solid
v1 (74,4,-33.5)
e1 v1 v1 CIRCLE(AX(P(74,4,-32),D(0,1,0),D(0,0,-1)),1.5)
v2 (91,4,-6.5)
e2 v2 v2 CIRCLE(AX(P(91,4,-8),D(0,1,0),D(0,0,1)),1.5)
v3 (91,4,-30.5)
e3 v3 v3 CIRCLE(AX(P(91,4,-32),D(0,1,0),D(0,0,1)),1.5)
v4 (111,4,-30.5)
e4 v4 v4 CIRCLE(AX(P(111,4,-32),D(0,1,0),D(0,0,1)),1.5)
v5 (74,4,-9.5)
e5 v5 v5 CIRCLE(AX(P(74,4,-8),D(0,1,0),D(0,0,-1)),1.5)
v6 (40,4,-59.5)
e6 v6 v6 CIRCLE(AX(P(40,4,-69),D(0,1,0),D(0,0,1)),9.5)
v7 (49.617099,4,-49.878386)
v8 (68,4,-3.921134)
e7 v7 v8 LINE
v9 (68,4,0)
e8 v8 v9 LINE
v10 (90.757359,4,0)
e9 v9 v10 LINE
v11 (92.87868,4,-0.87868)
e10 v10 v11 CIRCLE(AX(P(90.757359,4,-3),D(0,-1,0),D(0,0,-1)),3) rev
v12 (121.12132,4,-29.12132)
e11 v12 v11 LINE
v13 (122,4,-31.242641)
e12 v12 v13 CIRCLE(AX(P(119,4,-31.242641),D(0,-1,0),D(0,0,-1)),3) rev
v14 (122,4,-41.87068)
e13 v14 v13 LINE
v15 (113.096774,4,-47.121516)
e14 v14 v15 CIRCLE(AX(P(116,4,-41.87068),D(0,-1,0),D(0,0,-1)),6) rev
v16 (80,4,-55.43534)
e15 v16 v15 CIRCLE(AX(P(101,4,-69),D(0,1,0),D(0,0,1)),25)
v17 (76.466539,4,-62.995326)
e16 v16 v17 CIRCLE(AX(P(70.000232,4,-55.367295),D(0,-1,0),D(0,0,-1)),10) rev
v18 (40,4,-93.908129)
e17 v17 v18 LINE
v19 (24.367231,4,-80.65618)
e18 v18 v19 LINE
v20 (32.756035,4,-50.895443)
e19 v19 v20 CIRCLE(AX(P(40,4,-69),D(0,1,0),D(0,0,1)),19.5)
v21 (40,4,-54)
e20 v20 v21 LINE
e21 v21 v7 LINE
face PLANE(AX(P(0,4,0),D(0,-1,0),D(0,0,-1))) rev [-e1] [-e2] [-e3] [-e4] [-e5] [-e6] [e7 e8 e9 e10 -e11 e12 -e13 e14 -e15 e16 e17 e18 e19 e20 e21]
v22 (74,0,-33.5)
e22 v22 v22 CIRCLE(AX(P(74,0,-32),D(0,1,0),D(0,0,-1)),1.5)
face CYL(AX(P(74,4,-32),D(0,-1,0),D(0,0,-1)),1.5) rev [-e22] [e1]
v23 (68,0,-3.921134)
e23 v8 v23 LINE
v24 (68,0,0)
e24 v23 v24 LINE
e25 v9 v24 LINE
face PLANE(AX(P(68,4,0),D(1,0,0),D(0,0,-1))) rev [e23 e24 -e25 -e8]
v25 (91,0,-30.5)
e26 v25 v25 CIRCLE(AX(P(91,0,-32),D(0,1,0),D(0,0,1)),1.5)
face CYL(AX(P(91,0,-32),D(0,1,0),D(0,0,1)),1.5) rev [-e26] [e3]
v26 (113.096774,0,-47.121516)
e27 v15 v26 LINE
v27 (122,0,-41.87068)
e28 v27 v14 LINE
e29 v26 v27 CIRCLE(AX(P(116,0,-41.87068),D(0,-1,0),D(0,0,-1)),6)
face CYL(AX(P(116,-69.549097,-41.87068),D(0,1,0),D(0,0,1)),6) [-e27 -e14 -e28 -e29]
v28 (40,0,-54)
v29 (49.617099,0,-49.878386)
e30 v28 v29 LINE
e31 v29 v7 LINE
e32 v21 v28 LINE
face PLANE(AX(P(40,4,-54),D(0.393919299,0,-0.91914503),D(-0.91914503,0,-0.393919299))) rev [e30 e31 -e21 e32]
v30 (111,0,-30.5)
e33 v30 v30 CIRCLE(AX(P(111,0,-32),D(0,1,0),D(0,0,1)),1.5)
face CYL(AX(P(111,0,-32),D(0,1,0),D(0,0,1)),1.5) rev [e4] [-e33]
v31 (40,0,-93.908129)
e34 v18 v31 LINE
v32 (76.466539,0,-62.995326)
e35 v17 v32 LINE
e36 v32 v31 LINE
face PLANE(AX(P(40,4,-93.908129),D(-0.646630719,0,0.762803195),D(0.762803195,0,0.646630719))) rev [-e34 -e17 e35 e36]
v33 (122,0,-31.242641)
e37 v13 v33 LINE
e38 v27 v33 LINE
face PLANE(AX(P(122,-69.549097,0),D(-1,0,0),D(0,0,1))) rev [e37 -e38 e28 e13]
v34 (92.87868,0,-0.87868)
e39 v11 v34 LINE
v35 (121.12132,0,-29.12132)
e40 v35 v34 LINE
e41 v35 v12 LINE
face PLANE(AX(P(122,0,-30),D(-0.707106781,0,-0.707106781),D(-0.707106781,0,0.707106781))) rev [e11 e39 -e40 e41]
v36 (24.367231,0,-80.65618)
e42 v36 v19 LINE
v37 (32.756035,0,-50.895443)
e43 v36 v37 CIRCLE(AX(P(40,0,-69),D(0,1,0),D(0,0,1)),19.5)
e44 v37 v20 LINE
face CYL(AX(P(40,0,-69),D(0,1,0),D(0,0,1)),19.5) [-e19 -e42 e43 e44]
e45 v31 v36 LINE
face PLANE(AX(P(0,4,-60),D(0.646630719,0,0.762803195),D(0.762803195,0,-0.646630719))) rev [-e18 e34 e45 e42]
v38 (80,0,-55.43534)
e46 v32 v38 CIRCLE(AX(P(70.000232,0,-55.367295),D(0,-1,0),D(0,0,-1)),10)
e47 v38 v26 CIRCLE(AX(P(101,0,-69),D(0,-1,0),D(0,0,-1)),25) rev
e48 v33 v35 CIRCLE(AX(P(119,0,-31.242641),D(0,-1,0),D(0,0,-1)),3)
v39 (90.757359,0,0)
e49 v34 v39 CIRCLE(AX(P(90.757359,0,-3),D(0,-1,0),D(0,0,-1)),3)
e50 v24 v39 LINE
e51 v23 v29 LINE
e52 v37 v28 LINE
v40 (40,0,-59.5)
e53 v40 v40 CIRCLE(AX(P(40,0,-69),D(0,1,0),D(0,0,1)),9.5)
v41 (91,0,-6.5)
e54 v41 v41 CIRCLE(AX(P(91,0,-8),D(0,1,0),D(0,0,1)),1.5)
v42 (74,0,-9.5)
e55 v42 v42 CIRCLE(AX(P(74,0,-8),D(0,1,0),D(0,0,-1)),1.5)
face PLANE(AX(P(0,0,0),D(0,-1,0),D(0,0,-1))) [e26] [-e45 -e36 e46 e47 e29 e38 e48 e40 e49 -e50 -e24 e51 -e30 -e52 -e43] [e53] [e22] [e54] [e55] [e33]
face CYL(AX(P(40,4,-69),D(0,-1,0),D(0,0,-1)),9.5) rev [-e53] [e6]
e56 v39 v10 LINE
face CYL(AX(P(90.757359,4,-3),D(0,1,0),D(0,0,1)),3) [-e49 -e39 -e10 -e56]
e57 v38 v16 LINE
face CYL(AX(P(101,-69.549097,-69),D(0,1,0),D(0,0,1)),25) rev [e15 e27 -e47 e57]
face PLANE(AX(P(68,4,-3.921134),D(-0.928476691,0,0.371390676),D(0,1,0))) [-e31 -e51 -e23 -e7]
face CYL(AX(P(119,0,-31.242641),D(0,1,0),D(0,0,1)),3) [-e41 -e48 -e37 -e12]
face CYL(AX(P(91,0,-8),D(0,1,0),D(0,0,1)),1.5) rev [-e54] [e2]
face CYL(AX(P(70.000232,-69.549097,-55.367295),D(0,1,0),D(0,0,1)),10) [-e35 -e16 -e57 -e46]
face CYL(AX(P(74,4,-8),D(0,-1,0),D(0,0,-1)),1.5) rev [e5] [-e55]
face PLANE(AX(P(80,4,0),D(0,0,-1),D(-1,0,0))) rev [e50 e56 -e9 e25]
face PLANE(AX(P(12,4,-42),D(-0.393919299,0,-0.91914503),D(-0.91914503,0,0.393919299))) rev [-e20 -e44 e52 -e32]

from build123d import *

# Parameters (mm, degrees)
SKETCH_2_R          = 1.5
SKETCH_2_R_2        = 9.5
EXTRUDE_1_DEPTH     = 4
CUT_EXTRUDE_1_DEPTH = 124.429075185
EXTRUDE_2_DEPTH     = 4
SKETCH_7_R          = 1.5
CUT_EXTRUDE_2_DEPTH = 155.008884812
CUT_EXTRUDE_5_DEPTH = 155.008884812
FILLET_4_R          = 3
FILLET_5_R          = 6
FILLET_6_R          = 10
CHAMFER_1_SIZE      = 20
CHAMFER_1_SIZE2     = 38.078865529


with BuildPart() as part:
    # 草图2 → 凸台-拉伸1 (new body)
    with BuildSketch(Plane(origin=(0, 0, 0), x_dir=(1, 0, 0), z_dir=(0, 1, 0))):
        Polygon((0, 0), (0, 60), (40, 93.908128514), (80, 60), (80, 0), (68, 0), (68, 42), (40, 54), (12, 42), (12, 0), align=None)
        with Locations(Location((6, 32, 0), (0, 0, 270))):
            Circle(SKETCH_2_R, mode=Mode.SUBTRACT)
        with Locations(Location((6, 8, 0), (0, 0, 270))):
            Circle(SKETCH_2_R, mode=Mode.SUBTRACT)
        with Locations(Location((40, 69, 0), (0, 0, 270))):
            Circle(SKETCH_2_R_2, mode=Mode.SUBTRACT)
        with Locations(Location((74, 8, 0), (0, 0, 90))):
            Circle(SKETCH_2_R, mode=Mode.SUBTRACT)
        with Locations(Location((74, 32, 0), (0, 0, 90))):
            Circle(SKETCH_2_R, mode=Mode.SUBTRACT)
    extrude(amount=EXTRUDE_1_DEPTH)

    # 草图4 → 切除-拉伸1 (cut, through all)
    with BuildSketch(Plane(origin=(0, 4, 0), x_dir=(1, 0, 0), z_dir=(0, 1, 0))):
        with BuildLine():
            Line((24.36723091, 80.656179931), (0, 60))
            Line((0, 60), (0, 0))
            Line((0, 0), (12, 0))
            Line((12, 0), (12, 42))
            Line((12, 42), (32.756034747, 50.895443463))
            ThreePointArc((32.756034747, 50.895443463), (21.23136653, 63.709593809), (24.36723091, 80.656179931))
        make_face()
    extrude(amount=-CUT_EXTRUDE_1_DEPTH, mode=Mode.SUBTRACT)

    # 草图6 → 凸台-拉伸2 (add)
    with BuildSketch(Plane(origin=(0, 4, 0), x_dir=(1, 0, 0), z_dir=(0, 1, 0))):
        with BuildLine():
            ThreePointArc((122, 55.435340034), (101, 44), (80, 55.435340034))
            Line((80, 55.435340034), (80, 0))
            Line((80, 0), (122, 0))
            Line((122, 0), (122, 55.435340034))
        make_face()
    extrude(amount=-EXTRUDE_2_DEPTH)

    # 草图7 → 切除-拉伸2 (cut, through all)
    with BuildSketch(Plane(origin=(0, 4, 0), x_dir=(1, 0, 0), z_dir=(0, 1, 0))):
        with Locations(Location((91, 32, 0), (0, 0, 270))):
            Circle(SKETCH_7_R)
        with Locations(Location((74, 32, 0), (0, 0, 90))):
            Circle(SKETCH_7_R)
        with Locations(Location((74, 8, 0), (0, 0, 90))):
            Circle(SKETCH_7_R)
        with Locations(Location((111, 32, 0), (0, 0, 270))):
            Circle(SKETCH_7_R)
        with Locations(Location((111, 8, 0), (0, 0, 270))):
            Circle(SKETCH_7_R)
        with Locations(Location((91, 8, 0), (0, 0, 270))):
            Circle(SKETCH_7_R)
    extrude(amount=-CUT_EXTRUDE_2_DEPTH, mode=Mode.SUBTRACT)

    # 草图9 → 切除-拉伸5 (cut, through all)
    with BuildSketch(Plane(origin=(0, 4, 0), x_dir=(1, 0, 0), z_dir=(0, 1, 0))):
        Polygon((122, 30), (92, 0), (122, 0), align=None)
    extrude(amount=-CUT_EXTRUDE_5_DEPTH, mode=Mode.SUBTRACT)

    # 圆角4
    fillet_4_edges = [part.edges().sort_by_distance(p)[0] for p in [
        (122, 2, -30),
        (92, 2, 0),
    ]]
    fillet(fillet_4_edges, radius=FILLET_4_R)

    # 圆角5
    fillet_5_edges = [part.edges().sort_by_distance(p)[0] for p in [
        (122, 2, -55.435340034),
    ]]
    fillet(fillet_5_edges, radius=FILLET_5_R)

    # 圆角6
    # the kernel refuses this fillet: 10 mm, written as the material it takes off along each edge
    with BuildSketch(Plane(origin=(80, -11.580514233, -60), x_dir=(0, 0, 1), z_dir=(0, 1, 0))) as fillet_6_piece_1:
        with BuildLine():
            CenterArc((4.632705448, -9.999768488), FILLET_6_R, 90.389874902, 49.322073547)
            Line((-2.995326497, -3.5334613), (-3.147887136, -3.404135157))
            Line((-3.147887136, -3.404135157), (-0.152560639, 0.129326144))
            Line((-0.152560639, 0.129326144), (0, 0.2))
            ThreePointArc((0, 0.2), (2.282329983, 0.2), (4.563299057, 0.19999537))
            Line((4.563299057, 0.19999537), (4.564659966, 0))
        make_face()
    extrude(amount=27.161028465, mode=Mode.SUBTRACT)

    # 倒角1
    chamfer_1_edges = [part.edges().sort_by_distance(p)[0] for p in [
        (68, 2, -42),
    ]]
    chamfer_1_side = [part.faces().sort_by_distance(p)[0] for p in [
        (54, 2, -48),
    ]]
    chamfer(chamfer_1_edges, length=CHAMFER_1_SIZE, length2=CHAMFER_1_SIZE2, reference=chamfer_1_side[0])


solid = part.part
